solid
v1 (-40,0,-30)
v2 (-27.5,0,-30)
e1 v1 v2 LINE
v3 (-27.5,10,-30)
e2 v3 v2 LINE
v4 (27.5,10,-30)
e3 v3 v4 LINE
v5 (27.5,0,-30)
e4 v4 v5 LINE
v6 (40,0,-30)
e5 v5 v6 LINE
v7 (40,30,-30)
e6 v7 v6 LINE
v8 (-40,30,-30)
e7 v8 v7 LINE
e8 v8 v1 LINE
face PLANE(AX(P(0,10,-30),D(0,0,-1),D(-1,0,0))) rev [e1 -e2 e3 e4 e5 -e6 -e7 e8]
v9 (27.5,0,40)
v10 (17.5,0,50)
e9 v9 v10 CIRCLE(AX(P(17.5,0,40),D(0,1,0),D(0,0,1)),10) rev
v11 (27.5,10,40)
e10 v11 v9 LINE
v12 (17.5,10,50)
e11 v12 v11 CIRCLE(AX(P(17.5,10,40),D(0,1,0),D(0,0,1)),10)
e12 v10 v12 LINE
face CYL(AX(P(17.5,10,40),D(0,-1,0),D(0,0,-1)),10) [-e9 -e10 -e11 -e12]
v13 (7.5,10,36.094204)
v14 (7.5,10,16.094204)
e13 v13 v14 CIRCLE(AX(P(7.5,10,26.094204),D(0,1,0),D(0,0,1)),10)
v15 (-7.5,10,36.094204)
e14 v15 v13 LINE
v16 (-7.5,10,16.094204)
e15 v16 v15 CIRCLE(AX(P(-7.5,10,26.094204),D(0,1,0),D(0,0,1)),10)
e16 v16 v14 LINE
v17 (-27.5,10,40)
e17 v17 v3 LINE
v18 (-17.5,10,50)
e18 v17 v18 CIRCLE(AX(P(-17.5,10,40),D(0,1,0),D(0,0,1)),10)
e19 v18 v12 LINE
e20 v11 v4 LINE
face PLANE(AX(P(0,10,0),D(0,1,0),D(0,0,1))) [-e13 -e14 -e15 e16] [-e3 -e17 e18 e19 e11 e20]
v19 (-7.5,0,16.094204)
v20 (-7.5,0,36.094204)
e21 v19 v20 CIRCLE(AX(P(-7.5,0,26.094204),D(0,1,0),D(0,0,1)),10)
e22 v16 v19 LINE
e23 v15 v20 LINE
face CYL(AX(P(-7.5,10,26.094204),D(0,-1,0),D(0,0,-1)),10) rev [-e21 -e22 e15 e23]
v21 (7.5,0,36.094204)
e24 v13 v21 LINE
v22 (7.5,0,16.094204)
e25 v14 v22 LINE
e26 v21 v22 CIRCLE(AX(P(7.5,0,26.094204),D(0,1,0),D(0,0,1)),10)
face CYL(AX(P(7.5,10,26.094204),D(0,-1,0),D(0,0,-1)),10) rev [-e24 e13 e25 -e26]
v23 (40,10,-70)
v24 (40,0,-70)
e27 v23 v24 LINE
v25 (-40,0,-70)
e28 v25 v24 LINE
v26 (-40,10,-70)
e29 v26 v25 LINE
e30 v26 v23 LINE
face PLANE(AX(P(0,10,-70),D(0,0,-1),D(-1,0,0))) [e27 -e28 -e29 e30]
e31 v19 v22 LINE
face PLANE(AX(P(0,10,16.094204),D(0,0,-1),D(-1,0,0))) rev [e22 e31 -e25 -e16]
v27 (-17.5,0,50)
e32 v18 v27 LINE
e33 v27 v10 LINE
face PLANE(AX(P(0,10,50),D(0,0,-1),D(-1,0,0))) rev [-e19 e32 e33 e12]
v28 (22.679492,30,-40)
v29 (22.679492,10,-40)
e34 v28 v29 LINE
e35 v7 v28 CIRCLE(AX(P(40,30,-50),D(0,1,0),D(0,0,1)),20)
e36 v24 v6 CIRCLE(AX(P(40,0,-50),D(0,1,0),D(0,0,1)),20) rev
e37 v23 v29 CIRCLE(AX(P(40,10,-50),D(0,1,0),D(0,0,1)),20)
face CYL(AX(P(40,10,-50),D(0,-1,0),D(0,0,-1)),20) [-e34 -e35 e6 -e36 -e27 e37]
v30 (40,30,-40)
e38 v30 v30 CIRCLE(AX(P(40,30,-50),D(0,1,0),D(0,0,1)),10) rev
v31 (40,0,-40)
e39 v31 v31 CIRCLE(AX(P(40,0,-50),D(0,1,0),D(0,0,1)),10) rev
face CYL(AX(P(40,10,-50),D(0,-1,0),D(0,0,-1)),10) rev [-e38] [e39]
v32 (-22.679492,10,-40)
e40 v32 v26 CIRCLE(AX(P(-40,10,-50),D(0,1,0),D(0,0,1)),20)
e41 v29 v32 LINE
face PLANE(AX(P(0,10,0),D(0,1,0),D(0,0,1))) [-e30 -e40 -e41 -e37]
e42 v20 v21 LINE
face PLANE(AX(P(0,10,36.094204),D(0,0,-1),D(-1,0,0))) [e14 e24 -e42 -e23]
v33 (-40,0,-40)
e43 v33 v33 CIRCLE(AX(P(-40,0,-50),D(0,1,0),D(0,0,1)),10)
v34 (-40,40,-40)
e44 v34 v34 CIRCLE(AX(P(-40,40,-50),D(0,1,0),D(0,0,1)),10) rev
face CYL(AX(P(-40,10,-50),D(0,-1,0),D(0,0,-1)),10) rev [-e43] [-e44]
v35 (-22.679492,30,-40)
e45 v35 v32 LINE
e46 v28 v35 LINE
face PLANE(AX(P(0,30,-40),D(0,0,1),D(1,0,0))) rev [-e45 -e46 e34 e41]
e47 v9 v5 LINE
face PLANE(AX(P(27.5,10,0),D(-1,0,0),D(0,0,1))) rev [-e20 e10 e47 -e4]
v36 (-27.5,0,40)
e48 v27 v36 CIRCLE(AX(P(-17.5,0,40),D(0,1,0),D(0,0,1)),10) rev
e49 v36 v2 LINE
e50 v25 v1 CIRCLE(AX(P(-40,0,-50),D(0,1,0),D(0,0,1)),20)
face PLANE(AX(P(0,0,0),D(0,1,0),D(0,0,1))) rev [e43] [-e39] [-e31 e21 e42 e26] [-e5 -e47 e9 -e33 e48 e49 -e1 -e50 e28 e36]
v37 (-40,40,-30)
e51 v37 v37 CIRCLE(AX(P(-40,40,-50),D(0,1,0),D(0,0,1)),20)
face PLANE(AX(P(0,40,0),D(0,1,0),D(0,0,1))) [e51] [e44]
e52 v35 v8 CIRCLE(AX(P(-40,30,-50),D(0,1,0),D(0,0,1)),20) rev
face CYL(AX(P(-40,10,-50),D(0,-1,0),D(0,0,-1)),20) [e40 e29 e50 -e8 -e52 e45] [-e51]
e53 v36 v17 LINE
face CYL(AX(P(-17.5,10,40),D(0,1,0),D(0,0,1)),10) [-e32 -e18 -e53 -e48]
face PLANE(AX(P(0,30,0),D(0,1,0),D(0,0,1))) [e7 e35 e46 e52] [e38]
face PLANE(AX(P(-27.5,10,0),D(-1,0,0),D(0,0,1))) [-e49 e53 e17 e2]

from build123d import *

# Parameters (mm, degrees)
SKETCH1_R           = 10
BOSS_EXTRUDE1_DEPTH = 10
SKETCH2_R           = 10
BOSS_EXTRUDE2_DEPTH = 20
SKETCH2_3_R         = 20
SKETCH2_3_R_2       = 10
BOSS_EXTRUDE3_DEPTH = 30
FILLET1_R           = 10


with BuildPart() as part:
    # Sketch1 → Boss-Extrude1 (new body)
    with BuildSketch(Plane(origin=(0, 0, 0), x_dir=(1, 0, 0), z_dir=(0, 1, 0))):
        with BuildLine():
            Line((-27.5, 30), (-27.5, -50))
            Line((-27.5, -50), (27.5, -50))
            Line((27.5, -50), (27.5, 30))
            Line((27.5, 30), (40, 30))
            ThreePointArc((40, 30), (60, 50), (40, 70))
            Line((40, 70), (-40, 70))
            ThreePointArc((-40, 70), (-60, 50), (-40, 30))
            Line((-40, 30), (-27.5, 30))
        make_face()
        with BuildLine():
            ThreePointArc((-7.5, -36.09420366), (-17.5, -26.09420366), (-7.5, -16.09420366))
            Line((-7.5, -16.09420366), (7.5, -16.09420366))
            ThreePointArc((7.5, -16.09420366), (17.5, -26.09420366), (7.5, -36.09420366))
            Line((7.5, -36.09420366), (-7.5, -36.09420366))
        make_face(mode=Mode.SUBTRACT)
        with Locations((-40, 50)):
            Circle(SKETCH1_R, mode=Mode.SUBTRACT)
        with Locations((40, 50)):
            Circle(SKETCH1_R, mode=Mode.SUBTRACT)
    extrude(amount=BOSS_EXTRUDE1_DEPTH)

    # Sketch2 → Boss-Extrude2 (add)
    with BuildSketch(Plane(origin=(0, 10, 0), x_dir=(1, 0, 0), z_dir=(0, 1, 0))):
        with BuildLine():
            Line((22.679491924, 40), (-22.679491924, 40))
            ThreePointArc((-22.679491924, 40), (-50, 67.320508076), (-40, 30))
            Line((-40, 30), (40, 30))
            ThreePointArc((40, 30), (50, 67.320508076), (22.679491924, 40))
        make_face()
        with Locations((40, 50)):
            Circle(SKETCH2_R, mode=Mode.SUBTRACT)
        with Locations((-40, 50)):
            Circle(SKETCH2_R, mode=Mode.SUBTRACT)
    extrude(amount=BOSS_EXTRUDE2_DEPTH)

    # Sketch2<3> → Boss-Extrude3 (add)
    with BuildSketch(Plane(origin=(0, 10, 0), x_dir=(1, 0, 0), z_dir=(0, 1, 0))):
        with Locations((-40, 50)):
            Circle(SKETCH2_3_R)
        with Locations((-40, 50)):
            Circle(SKETCH2_3_R_2, mode=Mode.SUBTRACT)
    extrude(amount=BOSS_EXTRUDE3_DEPTH)

    # Fillet1
    fillet1_edges = [part.edges().sort_by_distance(p)[0] for p in [
        (-27.5, 5, 50),
        (27.5, 5, 50),
    ]]
    fillet(fillet1_edges, radius=FILLET1_R)


solid = part.part
